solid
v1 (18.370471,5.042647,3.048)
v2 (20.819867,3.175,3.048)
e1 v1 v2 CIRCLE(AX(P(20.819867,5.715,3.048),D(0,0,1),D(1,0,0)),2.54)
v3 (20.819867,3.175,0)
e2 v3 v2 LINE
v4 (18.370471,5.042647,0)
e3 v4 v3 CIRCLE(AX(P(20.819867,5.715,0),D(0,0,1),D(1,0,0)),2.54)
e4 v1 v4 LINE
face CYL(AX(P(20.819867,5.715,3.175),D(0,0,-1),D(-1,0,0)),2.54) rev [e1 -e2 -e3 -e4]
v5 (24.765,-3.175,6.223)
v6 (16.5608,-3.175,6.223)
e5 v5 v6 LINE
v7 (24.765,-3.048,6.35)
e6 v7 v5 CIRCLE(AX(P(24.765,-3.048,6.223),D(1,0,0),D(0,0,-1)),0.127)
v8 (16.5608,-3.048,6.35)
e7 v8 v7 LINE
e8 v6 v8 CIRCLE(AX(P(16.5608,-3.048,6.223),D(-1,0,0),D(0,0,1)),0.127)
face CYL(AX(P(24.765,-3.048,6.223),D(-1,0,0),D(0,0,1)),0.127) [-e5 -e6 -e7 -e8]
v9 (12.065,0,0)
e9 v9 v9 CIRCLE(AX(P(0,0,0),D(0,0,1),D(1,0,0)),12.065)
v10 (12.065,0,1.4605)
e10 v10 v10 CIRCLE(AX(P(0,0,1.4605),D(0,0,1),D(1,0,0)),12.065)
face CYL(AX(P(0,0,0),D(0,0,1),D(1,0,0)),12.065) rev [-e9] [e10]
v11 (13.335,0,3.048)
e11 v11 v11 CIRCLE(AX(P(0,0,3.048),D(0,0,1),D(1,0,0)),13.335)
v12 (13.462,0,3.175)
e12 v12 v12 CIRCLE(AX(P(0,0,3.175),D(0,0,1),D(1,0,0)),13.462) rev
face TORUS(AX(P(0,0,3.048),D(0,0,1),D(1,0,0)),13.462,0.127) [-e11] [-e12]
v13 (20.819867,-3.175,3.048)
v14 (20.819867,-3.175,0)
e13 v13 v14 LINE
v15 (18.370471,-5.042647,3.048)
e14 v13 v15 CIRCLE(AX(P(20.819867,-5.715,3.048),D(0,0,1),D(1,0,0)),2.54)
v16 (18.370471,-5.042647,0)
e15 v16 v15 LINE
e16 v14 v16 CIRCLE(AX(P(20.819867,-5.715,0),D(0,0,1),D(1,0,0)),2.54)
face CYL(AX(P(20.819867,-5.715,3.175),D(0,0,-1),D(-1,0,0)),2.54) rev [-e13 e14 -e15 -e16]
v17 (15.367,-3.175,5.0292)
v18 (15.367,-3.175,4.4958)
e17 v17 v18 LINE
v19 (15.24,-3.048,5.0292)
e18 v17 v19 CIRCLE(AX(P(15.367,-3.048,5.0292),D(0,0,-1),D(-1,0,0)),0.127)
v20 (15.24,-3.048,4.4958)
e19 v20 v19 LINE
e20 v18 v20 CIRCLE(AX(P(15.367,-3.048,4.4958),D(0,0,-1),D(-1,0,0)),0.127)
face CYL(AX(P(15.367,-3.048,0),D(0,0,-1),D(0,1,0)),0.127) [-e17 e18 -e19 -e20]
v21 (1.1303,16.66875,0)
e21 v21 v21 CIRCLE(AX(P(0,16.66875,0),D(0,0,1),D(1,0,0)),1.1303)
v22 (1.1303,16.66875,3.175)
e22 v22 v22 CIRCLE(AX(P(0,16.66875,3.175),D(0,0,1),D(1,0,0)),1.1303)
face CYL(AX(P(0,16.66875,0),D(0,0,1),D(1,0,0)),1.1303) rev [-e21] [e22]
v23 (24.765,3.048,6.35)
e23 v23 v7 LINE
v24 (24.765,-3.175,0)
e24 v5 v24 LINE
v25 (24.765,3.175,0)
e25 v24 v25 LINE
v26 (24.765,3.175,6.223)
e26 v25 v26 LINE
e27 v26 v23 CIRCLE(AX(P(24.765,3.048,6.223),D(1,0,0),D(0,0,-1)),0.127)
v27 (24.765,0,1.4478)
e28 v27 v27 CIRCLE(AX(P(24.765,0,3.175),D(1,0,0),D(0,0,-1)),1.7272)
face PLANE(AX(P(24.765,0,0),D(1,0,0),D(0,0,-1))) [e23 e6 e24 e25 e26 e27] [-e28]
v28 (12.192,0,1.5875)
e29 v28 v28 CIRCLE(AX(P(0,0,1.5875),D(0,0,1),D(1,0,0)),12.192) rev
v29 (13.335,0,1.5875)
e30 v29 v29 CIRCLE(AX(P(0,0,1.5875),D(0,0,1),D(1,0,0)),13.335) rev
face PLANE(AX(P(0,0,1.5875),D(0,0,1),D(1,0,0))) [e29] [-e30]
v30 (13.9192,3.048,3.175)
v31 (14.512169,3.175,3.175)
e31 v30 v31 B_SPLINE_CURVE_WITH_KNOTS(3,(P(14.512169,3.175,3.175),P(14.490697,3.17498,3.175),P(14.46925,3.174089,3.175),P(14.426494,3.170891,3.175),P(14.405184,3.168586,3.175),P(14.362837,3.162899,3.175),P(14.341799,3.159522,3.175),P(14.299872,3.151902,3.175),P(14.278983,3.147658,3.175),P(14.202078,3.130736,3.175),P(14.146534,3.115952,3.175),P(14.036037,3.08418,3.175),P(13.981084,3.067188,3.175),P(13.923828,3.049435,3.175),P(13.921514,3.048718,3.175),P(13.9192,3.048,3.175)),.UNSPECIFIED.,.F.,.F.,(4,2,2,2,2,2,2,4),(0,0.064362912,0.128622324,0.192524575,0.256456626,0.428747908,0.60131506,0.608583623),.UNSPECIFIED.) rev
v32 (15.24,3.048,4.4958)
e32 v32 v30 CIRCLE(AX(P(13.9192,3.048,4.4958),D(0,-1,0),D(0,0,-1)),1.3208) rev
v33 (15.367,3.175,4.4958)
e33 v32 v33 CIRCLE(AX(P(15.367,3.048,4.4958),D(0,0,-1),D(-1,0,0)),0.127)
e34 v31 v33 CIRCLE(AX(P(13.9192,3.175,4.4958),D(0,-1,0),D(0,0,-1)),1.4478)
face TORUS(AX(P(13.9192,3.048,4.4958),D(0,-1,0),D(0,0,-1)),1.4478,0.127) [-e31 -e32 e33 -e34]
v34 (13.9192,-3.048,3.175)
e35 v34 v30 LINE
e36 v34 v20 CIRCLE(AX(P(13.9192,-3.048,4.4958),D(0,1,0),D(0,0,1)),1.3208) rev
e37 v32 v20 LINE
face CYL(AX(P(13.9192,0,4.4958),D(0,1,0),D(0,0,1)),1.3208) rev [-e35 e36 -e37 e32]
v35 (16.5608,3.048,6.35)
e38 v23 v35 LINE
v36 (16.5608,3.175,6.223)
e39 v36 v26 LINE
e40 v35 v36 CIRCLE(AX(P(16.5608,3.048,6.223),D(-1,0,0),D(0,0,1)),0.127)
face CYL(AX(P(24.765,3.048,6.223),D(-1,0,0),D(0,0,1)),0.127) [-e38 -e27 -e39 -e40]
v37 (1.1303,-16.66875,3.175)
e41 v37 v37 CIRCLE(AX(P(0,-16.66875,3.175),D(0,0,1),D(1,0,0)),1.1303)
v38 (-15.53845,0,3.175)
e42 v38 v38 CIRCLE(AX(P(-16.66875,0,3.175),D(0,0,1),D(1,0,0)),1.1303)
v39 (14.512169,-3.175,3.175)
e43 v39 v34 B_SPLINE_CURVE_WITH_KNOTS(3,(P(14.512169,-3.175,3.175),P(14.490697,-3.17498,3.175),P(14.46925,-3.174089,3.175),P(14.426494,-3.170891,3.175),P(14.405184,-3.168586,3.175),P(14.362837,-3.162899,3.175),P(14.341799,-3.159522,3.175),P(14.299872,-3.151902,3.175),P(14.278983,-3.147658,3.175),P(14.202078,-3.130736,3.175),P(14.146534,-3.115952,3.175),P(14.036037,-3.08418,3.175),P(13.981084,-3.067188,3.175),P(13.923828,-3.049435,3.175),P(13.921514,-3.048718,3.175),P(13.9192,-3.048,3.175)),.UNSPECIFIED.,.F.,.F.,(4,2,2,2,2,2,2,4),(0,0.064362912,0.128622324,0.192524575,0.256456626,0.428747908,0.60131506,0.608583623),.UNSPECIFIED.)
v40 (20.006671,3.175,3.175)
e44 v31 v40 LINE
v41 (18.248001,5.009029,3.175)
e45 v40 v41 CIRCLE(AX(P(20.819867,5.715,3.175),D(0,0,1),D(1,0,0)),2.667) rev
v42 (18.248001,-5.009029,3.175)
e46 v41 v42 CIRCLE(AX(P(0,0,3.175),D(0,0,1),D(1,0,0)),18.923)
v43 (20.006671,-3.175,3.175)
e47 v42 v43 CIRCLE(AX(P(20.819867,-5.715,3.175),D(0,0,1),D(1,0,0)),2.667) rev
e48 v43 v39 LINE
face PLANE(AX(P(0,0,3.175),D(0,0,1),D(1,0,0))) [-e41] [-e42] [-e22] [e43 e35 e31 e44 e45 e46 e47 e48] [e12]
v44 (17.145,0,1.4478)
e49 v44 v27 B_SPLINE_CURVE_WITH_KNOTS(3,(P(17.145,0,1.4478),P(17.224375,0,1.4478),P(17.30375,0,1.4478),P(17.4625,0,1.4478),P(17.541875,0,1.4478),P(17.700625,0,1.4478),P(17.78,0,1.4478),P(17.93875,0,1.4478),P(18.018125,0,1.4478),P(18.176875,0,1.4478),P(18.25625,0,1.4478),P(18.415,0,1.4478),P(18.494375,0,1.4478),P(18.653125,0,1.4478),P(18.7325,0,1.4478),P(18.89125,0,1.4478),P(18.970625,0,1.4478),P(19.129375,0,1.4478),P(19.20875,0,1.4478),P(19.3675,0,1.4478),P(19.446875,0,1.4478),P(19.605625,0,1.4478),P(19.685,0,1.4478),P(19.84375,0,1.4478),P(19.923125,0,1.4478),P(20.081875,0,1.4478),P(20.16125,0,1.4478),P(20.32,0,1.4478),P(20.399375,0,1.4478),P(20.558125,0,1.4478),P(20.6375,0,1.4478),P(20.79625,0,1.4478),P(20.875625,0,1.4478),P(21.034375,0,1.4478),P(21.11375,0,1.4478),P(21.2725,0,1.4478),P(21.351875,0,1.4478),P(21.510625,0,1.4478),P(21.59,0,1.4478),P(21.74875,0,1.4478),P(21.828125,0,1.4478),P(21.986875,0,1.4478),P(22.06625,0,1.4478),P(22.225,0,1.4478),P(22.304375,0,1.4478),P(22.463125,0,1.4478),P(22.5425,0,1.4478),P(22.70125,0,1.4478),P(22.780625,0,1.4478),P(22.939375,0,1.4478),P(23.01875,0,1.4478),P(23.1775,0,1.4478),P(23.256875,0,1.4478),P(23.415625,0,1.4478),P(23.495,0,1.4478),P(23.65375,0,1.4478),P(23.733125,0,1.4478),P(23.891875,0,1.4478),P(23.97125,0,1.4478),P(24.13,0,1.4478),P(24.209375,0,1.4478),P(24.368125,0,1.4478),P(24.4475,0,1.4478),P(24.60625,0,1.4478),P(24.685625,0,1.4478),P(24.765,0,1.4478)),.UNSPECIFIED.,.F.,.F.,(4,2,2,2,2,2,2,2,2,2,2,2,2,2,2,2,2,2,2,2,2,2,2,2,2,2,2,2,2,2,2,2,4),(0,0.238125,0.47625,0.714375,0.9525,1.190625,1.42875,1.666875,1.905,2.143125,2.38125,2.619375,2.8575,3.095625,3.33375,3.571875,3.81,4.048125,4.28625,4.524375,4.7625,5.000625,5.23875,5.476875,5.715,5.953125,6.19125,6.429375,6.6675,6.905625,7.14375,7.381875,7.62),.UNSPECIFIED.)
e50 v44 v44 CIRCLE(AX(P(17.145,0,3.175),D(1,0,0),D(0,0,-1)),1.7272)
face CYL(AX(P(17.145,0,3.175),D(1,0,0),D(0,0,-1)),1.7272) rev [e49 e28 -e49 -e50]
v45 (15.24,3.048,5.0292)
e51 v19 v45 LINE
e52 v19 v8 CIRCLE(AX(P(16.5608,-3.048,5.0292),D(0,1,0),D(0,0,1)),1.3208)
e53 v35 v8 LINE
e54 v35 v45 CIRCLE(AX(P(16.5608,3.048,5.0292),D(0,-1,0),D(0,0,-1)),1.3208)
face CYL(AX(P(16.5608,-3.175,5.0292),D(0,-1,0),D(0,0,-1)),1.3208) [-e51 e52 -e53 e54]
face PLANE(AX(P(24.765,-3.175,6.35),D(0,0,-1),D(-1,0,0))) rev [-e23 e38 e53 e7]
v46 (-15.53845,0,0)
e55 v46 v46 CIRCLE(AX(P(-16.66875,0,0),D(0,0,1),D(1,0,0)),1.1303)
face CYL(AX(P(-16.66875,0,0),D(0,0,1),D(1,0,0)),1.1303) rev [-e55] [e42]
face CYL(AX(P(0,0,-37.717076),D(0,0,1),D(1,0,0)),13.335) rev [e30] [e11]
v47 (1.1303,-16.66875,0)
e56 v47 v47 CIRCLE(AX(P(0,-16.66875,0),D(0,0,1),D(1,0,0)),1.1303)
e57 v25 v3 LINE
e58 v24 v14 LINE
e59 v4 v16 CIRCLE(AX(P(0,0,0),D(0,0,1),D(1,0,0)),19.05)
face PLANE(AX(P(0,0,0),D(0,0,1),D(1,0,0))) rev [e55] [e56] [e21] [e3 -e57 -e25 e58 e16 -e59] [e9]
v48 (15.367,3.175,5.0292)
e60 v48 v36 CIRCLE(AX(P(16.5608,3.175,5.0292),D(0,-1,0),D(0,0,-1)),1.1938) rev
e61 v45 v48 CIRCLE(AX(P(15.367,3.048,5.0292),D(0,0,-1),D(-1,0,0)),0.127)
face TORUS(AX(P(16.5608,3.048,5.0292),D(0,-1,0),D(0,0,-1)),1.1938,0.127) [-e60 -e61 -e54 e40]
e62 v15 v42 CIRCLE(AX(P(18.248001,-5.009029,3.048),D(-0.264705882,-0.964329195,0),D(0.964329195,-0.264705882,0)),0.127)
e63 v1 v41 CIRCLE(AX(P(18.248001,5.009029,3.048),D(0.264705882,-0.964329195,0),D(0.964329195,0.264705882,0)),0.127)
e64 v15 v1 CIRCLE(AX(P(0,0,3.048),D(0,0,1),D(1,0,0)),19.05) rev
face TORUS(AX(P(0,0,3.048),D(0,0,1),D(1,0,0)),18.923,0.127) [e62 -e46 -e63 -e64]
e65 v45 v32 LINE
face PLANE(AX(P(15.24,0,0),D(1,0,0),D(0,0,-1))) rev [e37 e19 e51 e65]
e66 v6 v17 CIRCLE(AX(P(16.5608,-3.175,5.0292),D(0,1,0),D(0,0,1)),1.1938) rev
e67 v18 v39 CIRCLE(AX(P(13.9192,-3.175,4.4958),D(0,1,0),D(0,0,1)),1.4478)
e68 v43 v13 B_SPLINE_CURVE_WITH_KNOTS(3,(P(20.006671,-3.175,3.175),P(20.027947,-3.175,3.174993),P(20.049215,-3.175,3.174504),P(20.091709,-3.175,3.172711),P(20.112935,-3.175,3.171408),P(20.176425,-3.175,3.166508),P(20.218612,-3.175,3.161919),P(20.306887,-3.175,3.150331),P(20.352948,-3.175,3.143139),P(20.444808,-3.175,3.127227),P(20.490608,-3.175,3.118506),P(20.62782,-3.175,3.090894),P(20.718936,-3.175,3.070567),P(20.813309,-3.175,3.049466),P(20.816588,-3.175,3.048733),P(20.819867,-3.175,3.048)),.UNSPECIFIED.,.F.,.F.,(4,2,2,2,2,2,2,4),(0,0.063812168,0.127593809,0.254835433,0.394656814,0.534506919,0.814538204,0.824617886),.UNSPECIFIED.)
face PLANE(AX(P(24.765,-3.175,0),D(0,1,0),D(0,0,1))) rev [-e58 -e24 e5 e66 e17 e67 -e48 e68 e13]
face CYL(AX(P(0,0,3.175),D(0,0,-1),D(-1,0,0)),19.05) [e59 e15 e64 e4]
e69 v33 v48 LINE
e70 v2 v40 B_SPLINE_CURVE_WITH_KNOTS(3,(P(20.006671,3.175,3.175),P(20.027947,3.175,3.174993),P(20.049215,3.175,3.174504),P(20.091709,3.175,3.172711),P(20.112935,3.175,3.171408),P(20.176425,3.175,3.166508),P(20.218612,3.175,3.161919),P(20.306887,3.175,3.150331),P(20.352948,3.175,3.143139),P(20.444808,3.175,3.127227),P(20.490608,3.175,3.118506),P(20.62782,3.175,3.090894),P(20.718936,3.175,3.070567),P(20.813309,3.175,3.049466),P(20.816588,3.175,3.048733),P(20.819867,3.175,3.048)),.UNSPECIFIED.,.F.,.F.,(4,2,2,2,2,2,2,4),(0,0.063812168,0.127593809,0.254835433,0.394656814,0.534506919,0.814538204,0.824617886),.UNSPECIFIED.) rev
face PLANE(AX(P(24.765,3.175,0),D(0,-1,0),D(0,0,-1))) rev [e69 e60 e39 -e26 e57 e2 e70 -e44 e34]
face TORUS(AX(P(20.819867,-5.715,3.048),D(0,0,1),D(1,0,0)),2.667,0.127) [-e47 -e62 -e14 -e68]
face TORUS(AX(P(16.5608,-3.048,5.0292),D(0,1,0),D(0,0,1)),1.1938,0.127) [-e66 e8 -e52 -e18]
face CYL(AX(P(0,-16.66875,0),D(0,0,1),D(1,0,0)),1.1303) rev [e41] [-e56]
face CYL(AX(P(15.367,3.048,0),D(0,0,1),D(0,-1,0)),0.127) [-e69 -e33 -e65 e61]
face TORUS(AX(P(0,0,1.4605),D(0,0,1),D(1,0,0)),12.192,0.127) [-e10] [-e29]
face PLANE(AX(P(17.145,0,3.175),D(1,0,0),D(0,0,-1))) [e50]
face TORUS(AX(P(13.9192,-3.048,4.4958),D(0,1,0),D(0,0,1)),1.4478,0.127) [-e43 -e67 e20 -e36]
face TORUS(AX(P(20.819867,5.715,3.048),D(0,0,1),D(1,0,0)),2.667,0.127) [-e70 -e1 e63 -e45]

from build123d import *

# Parameters (mm, degrees)
SKETCH1_R           = 19.05
BOSS_EXTRUDE1_DEPTH = 3.175
SKETCH2_R           = 12.065
CUT_EXTRUDE1_DEPTH  = 28.127211891
SKETCH3_R           = 13.335
CUT_EXTRUDE2_DEPTH  = 1.5875
BOSS_EXTRUDE2_START = 15.24
SKETCH4_W           = 6.35
SKETCH4_H           = 6.35
BOSS_EXTRUDE2_DEPTH = 9.525
FILLET1_R           = 2.54
SKETCH5_R           = 1.7272
CUT_EXTRUDE3_DEPTH  = 7.62
FILLET2_R           = 1.3208
FILLET3_R           = 0.127
SKETCH6_R           = 1.1303
CUT_EXTRUDE4_DEPTH  = 32.405228218


with BuildPart() as part:
    # Sketch1 → Boss-Extrude1 (new body)
    with BuildSketch(Plane.XY):
        Circle(SKETCH1_R)
    extrude(amount=BOSS_EXTRUDE1_DEPTH)

    # Sketch2 → Cut-Extrude1 (cut, through all)
    with BuildSketch(Plane.XY.offset(3.175)):
        Circle(SKETCH2_R)
    extrude(amount=-CUT_EXTRUDE1_DEPTH, mode=Mode.SUBTRACT)

    # Sketch3 → Cut-Extrude2 (cut)
    with BuildSketch(Plane.XY.offset(3.175)):
        Circle(SKETCH3_R)
    extrude(amount=-CUT_EXTRUDE2_DEPTH, mode=Mode.SUBTRACT)

    # Sketch4 → Boss-Extrude2 (add)
    with BuildSketch(Plane(origin=(0, 0, 0), x_dir=(0, 0, -1), z_dir=(1, 0, 0)).offset(BOSS_EXTRUDE2_START)):
        with Locations((-3.175, 0)):
            Rectangle(SKETCH4_W, SKETCH4_H)
    extrude(amount=BOSS_EXTRUDE2_DEPTH)

    # Fillet1
    fillet1_edges = [part.edges().sort_by_distance(p)[0] for p in [
        (18.783553311, -3.175, 1.5875),
        (18.783553311, 3.175, 1.5875),
    ]]
    fillet(fillet1_edges, radius=FILLET1_R)

    # Sketch5 → Cut-Extrude3 (cut)
    with BuildSketch(Plane(origin=(24.765, 0, 0), x_dir=(0, 0, -1), z_dir=(1, 0, 0))):
        with Locations((-3.175, 0)):
            Circle(SKETCH5_R)
    extrude(amount=-CUT_EXTRUDE3_DEPTH, mode=Mode.SUBTRACT)

    # Fillet2
    fillet2_edges = [part.edges().sort_by_distance(p)[0] for p in [
        (15.24, 0, 3.175),
        (15.24, 0, 6.35),
    ]]
    fillet(fillet2_edges, radius=FILLET2_R)

    # Fillet3
    # the kernel refuses this fillet: 0.127 mm, written as the material it takes off along each edge
    with BuildSketch(Plane(origin=(0, 0, 3.175), x_dir=(1, 0, 0), z_dir=(0, -1, 0))) as fillet3_piece_1:
        with BuildLine():
            CenterArc((13.335 + FILLET3_R, -FILLET3_R), FILLET3_R, 90, 90)
            Line((13.335, -FILLET3_R), (13.335, 0))
            Line((13.335, 0), (13.335 + FILLET3_R, 0))
        make_face()
    revolve(axis=Axis((0, 0, 3.175), (0, 0, 1)), mode=Mode.SUBTRACT)
    with BuildSketch(Plane(origin=(0, 0, 1.5875), x_dir=(1, 0, 0), z_dir=(0, -1, 0))) as fillet3_piece_2:
        with BuildLine():
            CenterArc((12.065 + FILLET3_R, -FILLET3_R), FILLET3_R, 90, 90)
            Line((12.065, -FILLET3_R), (12.065, 0))
            Line((12.065, 0), (12.065 + FILLET3_R, 0))
        make_face()
    revolve(axis=Axis((0, 0, 1.5875), (0, 0, 1)), mode=Mode.SUBTRACT)
    with BuildSketch(Plane(origin=(16.5608, -3.175, 6.35), x_dir=(0, 0, -1), z_dir=(1, 0, 0))) as fillet3_piece_3:
        with BuildLine():
            CenterArc((FILLET3_R, FILLET3_R), FILLET3_R, 180, 90)
            Line((0, FILLET3_R), (0, 0))
            Line((0, 0), (FILLET3_R, 0))
        make_face()
    extrude(amount=8.5217, mode=Mode.SUBTRACT)
    with BuildSketch(Plane(origin=(16.5608, 3.175, 6.35), x_dir=(0, 0, -1), z_dir=(1, 0, 0))) as fillet3_piece_4:
        with BuildLine():
            CenterArc((FILLET3_R, -FILLET3_R), FILLET3_R, 90, 90)
            Line((0, -FILLET3_R), (0, 0))
            Line((0, 0), (FILLET3_R, 0))
        make_face()
    extrude(amount=8.5217, mode=Mode.SUBTRACT)
    with BuildSketch(Plane(origin=(0, 0, 3.175), x_dir=(0.9643291947502942, 0.2647058823529412, 0), z_dir=(0.2647058823529412, -0.9643291947502942, 0))) as fillet3_piece_5:
        with BuildLine():
            CenterArc((19.05 - FILLET3_R, -FILLET3_R), FILLET3_R, 0, 90)
            Line((19.05 - FILLET3_R, 0), (19.05, 0))
            Line((19.05, 0), (19.05, -FILLET3_R))
        make_face()
    revolve(axis=Axis((0, 0, 3.175), (0, 0, 1)), revolution_arc=329.301045966, mode=Mode.SUBTRACT)
    with BuildSketch(Plane(origin=(20.819867315, 5.715, 3.175), x_dir=(0.12470900704731759, -0.9921933599663284, 0), z_dir=(0.9921933599663284, 0.12470900704731759, 0))) as fillet3_piece_6_section:
        with BuildLine():
            CenterArc((2.54 + FILLET3_R, FILLET3_R), FILLET3_R, 180, 90)
            Line((2.54, FILLET3_R), (2.54, 0))
            Line((2.54, 0), (2.54 + FILLET3_R, 0))
        make_face()
    fillet3_piece_6 = revolve(axis=Axis((20.819867315, 5.715, 3.175), (0, 0, -1)), revolution_arc=81.814474605, mode=Mode.PRIVATE)
    fillet3_piece_6 = split(fillet3_piece_6, bisect_by=Plane(origin=(19.258112291, 3.175, 3.13928763), z_dir=(0, 1, 0)), keep=Keep.TOP, mode=Mode.PRIVATE)
    add(fillet3_piece_6, mode=Mode.SUBTRACT)
    with BuildSketch(Plane(origin=(20.819867315, -5.715, 3.175), x_dir=(0.12470900704731899, 0.9921933599663282, 0), z_dir=(0.9921933599663282, -0.12470900704731899, 0))) as fillet3_piece_7_section:
        with BuildLine():
            CenterArc((2.54 + FILLET3_R, -FILLET3_R), FILLET3_R, 90, 90)
            Line((2.54 + FILLET3_R, 0), (2.54, 0))
            Line((2.54, 0), (2.54, -FILLET3_R))
        make_face()
    fillet3_piece_7 = revolve(axis=Axis((20.819867315, -5.715, 3.175), (0, 0, 1)), revolution_arc=81.814474605, mode=Mode.PRIVATE)
    fillet3_piece_7 = split(fillet3_piece_7, bisect_by=Plane(origin=(19.258112291, -3.175, 3.13928763), z_dir=(0, -1, 0)), keep=Keep.TOP, mode=Mode.PRIVATE)
    add(fillet3_piece_7, mode=Mode.SUBTRACT)
    with BuildSketch(Plane(origin=(15.24, -3.175, 4.4958), x_dir=(1, 0, 0), z_dir=(0, 0, 1)), Plane(origin=(15.24, 3.175, 5.0292), x_dir=(1, 0, 0), z_dir=(0, 0, -1))) as fillet3_piece_8:
        with BuildLine():
            CenterArc((FILLET3_R, FILLET3_R), FILLET3_R, 180, 90)
            Line((0, FILLET3_R), (0, 0))
            Line((0, 0), (FILLET3_R, 0))
        make_face()
    extrude(amount=0.5334, mode=Mode.SUBTRACT)
    with BuildSketch(Plane(origin=(16.5608, -3.175, 5.0292), x_dir=(-1, 0, 0), z_dir=(0, 0, -1))) as fillet3_piece_9:
        with BuildLine():
            CenterArc((1.3208 - FILLET3_R, FILLET3_R), FILLET3_R, 270, 90)
            Line((1.3208, FILLET3_R), (1.3208, 0))
            Line((1.3208, 0), (1.3208 - FILLET3_R, 0))
        make_face()
    revolve(axis=Axis((16.5608, -3.175, 5.0292), (0, 1, 0)), revolution_arc=90, mode=Mode.SUBTRACT)
    with BuildSketch(Plane(origin=(16.5608, 3.175, 5.0292), x_dir=(-1, 0, 0), z_dir=(0, 0, -1))) as fillet3_piece_10:
        with BuildLine():
            CenterArc((1.3208 - FILLET3_R, -FILLET3_R), FILLET3_R, 0, 90)
            Line((1.3208, -FILLET3_R), (1.3208, 0))
            Line((1.3208, 0), (1.3208 - FILLET3_R, 0))
        make_face()
    revolve(axis=Axis((16.5608, 3.175, 5.0292), (0, 1, 0)), revolution_arc=90, mode=Mode.SUBTRACT)
    with BuildSketch(Plane(origin=(13.9192, 3.175, 4.4958), x_dir=(-0.23816998714710041, 0, -0.9712234846946144), z_dir=(-0.9712234846946144, 0, 0.23816998714710041))) as fillet3_piece_11_section:
        with BuildLine():
            CenterArc((1.3208 + FILLET3_R, FILLET3_R), FILLET3_R, 180, 90)
            Line((1.3208, FILLET3_R), (1.3208, 0))
            Line((1.3208, 0), (1.3208 + FILLET3_R, 0))
        make_face()
    fillet3_piece_11 = revolve(axis=Axis((13.9192, 3.175, 4.4958), (0, -1, 0)), revolution_arc=103.778556657, mode=Mode.PRIVATE)
    fillet3_piece_11 = split(fillet3_piece_11, bisect_by=Plane(origin=(14.878561501, 3.139057971, 3.175), z_dir=(0, 0, 1)), keep=Keep.TOP, mode=Mode.PRIVATE)
    add(fillet3_piece_11, mode=Mode.SUBTRACT)
    with BuildSketch(Plane(origin=(13.9192, -3.175, 4.4958), x_dir=(-0.23816998714710186, 0, -0.9712234846946141), z_dir=(-0.9712234846946141, 0, 0.23816998714710186))) as fillet3_piece_12_section:
        with BuildLine():
            CenterArc((1.3208 + FILLET3_R, -FILLET3_R), FILLET3_R, 90, 90)
            Line((1.3208 + FILLET3_R, 0), (1.3208, 0))
            Line((1.3208, 0), (1.3208, -FILLET3_R))
        make_face()
    fillet3_piece_12 = revolve(axis=Axis((13.9192, -3.175, 4.4958), (0, -1, 0)), revolution_arc=103.778556657, mode=Mode.PRIVATE)
    fillet3_piece_12 = split(fillet3_piece_12, bisect_by=Plane(origin=(14.878561477, -3.139057971, 3.175), z_dir=(0, 0, 1)), keep=Keep.TOP, mode=Mode.PRIVATE)
    add(fillet3_piece_12, mode=Mode.SUBTRACT)

    # Sketch6 → Cut-Extrude4 (cut, through all)
    with BuildSketch(Plane.XY.offset(3.175)):
        with Locations((-16.66875, 0)):
            Circle(SKETCH6_R)
        with Locations((0, 16.66875)):
            Circle(SKETCH6_R)
        with Locations((0, -16.66875)):
            Circle(SKETCH6_R)
    extrude(amount=-CUT_EXTRUDE4_DEPTH, mode=Mode.SUBTRACT)


solid = part.part
